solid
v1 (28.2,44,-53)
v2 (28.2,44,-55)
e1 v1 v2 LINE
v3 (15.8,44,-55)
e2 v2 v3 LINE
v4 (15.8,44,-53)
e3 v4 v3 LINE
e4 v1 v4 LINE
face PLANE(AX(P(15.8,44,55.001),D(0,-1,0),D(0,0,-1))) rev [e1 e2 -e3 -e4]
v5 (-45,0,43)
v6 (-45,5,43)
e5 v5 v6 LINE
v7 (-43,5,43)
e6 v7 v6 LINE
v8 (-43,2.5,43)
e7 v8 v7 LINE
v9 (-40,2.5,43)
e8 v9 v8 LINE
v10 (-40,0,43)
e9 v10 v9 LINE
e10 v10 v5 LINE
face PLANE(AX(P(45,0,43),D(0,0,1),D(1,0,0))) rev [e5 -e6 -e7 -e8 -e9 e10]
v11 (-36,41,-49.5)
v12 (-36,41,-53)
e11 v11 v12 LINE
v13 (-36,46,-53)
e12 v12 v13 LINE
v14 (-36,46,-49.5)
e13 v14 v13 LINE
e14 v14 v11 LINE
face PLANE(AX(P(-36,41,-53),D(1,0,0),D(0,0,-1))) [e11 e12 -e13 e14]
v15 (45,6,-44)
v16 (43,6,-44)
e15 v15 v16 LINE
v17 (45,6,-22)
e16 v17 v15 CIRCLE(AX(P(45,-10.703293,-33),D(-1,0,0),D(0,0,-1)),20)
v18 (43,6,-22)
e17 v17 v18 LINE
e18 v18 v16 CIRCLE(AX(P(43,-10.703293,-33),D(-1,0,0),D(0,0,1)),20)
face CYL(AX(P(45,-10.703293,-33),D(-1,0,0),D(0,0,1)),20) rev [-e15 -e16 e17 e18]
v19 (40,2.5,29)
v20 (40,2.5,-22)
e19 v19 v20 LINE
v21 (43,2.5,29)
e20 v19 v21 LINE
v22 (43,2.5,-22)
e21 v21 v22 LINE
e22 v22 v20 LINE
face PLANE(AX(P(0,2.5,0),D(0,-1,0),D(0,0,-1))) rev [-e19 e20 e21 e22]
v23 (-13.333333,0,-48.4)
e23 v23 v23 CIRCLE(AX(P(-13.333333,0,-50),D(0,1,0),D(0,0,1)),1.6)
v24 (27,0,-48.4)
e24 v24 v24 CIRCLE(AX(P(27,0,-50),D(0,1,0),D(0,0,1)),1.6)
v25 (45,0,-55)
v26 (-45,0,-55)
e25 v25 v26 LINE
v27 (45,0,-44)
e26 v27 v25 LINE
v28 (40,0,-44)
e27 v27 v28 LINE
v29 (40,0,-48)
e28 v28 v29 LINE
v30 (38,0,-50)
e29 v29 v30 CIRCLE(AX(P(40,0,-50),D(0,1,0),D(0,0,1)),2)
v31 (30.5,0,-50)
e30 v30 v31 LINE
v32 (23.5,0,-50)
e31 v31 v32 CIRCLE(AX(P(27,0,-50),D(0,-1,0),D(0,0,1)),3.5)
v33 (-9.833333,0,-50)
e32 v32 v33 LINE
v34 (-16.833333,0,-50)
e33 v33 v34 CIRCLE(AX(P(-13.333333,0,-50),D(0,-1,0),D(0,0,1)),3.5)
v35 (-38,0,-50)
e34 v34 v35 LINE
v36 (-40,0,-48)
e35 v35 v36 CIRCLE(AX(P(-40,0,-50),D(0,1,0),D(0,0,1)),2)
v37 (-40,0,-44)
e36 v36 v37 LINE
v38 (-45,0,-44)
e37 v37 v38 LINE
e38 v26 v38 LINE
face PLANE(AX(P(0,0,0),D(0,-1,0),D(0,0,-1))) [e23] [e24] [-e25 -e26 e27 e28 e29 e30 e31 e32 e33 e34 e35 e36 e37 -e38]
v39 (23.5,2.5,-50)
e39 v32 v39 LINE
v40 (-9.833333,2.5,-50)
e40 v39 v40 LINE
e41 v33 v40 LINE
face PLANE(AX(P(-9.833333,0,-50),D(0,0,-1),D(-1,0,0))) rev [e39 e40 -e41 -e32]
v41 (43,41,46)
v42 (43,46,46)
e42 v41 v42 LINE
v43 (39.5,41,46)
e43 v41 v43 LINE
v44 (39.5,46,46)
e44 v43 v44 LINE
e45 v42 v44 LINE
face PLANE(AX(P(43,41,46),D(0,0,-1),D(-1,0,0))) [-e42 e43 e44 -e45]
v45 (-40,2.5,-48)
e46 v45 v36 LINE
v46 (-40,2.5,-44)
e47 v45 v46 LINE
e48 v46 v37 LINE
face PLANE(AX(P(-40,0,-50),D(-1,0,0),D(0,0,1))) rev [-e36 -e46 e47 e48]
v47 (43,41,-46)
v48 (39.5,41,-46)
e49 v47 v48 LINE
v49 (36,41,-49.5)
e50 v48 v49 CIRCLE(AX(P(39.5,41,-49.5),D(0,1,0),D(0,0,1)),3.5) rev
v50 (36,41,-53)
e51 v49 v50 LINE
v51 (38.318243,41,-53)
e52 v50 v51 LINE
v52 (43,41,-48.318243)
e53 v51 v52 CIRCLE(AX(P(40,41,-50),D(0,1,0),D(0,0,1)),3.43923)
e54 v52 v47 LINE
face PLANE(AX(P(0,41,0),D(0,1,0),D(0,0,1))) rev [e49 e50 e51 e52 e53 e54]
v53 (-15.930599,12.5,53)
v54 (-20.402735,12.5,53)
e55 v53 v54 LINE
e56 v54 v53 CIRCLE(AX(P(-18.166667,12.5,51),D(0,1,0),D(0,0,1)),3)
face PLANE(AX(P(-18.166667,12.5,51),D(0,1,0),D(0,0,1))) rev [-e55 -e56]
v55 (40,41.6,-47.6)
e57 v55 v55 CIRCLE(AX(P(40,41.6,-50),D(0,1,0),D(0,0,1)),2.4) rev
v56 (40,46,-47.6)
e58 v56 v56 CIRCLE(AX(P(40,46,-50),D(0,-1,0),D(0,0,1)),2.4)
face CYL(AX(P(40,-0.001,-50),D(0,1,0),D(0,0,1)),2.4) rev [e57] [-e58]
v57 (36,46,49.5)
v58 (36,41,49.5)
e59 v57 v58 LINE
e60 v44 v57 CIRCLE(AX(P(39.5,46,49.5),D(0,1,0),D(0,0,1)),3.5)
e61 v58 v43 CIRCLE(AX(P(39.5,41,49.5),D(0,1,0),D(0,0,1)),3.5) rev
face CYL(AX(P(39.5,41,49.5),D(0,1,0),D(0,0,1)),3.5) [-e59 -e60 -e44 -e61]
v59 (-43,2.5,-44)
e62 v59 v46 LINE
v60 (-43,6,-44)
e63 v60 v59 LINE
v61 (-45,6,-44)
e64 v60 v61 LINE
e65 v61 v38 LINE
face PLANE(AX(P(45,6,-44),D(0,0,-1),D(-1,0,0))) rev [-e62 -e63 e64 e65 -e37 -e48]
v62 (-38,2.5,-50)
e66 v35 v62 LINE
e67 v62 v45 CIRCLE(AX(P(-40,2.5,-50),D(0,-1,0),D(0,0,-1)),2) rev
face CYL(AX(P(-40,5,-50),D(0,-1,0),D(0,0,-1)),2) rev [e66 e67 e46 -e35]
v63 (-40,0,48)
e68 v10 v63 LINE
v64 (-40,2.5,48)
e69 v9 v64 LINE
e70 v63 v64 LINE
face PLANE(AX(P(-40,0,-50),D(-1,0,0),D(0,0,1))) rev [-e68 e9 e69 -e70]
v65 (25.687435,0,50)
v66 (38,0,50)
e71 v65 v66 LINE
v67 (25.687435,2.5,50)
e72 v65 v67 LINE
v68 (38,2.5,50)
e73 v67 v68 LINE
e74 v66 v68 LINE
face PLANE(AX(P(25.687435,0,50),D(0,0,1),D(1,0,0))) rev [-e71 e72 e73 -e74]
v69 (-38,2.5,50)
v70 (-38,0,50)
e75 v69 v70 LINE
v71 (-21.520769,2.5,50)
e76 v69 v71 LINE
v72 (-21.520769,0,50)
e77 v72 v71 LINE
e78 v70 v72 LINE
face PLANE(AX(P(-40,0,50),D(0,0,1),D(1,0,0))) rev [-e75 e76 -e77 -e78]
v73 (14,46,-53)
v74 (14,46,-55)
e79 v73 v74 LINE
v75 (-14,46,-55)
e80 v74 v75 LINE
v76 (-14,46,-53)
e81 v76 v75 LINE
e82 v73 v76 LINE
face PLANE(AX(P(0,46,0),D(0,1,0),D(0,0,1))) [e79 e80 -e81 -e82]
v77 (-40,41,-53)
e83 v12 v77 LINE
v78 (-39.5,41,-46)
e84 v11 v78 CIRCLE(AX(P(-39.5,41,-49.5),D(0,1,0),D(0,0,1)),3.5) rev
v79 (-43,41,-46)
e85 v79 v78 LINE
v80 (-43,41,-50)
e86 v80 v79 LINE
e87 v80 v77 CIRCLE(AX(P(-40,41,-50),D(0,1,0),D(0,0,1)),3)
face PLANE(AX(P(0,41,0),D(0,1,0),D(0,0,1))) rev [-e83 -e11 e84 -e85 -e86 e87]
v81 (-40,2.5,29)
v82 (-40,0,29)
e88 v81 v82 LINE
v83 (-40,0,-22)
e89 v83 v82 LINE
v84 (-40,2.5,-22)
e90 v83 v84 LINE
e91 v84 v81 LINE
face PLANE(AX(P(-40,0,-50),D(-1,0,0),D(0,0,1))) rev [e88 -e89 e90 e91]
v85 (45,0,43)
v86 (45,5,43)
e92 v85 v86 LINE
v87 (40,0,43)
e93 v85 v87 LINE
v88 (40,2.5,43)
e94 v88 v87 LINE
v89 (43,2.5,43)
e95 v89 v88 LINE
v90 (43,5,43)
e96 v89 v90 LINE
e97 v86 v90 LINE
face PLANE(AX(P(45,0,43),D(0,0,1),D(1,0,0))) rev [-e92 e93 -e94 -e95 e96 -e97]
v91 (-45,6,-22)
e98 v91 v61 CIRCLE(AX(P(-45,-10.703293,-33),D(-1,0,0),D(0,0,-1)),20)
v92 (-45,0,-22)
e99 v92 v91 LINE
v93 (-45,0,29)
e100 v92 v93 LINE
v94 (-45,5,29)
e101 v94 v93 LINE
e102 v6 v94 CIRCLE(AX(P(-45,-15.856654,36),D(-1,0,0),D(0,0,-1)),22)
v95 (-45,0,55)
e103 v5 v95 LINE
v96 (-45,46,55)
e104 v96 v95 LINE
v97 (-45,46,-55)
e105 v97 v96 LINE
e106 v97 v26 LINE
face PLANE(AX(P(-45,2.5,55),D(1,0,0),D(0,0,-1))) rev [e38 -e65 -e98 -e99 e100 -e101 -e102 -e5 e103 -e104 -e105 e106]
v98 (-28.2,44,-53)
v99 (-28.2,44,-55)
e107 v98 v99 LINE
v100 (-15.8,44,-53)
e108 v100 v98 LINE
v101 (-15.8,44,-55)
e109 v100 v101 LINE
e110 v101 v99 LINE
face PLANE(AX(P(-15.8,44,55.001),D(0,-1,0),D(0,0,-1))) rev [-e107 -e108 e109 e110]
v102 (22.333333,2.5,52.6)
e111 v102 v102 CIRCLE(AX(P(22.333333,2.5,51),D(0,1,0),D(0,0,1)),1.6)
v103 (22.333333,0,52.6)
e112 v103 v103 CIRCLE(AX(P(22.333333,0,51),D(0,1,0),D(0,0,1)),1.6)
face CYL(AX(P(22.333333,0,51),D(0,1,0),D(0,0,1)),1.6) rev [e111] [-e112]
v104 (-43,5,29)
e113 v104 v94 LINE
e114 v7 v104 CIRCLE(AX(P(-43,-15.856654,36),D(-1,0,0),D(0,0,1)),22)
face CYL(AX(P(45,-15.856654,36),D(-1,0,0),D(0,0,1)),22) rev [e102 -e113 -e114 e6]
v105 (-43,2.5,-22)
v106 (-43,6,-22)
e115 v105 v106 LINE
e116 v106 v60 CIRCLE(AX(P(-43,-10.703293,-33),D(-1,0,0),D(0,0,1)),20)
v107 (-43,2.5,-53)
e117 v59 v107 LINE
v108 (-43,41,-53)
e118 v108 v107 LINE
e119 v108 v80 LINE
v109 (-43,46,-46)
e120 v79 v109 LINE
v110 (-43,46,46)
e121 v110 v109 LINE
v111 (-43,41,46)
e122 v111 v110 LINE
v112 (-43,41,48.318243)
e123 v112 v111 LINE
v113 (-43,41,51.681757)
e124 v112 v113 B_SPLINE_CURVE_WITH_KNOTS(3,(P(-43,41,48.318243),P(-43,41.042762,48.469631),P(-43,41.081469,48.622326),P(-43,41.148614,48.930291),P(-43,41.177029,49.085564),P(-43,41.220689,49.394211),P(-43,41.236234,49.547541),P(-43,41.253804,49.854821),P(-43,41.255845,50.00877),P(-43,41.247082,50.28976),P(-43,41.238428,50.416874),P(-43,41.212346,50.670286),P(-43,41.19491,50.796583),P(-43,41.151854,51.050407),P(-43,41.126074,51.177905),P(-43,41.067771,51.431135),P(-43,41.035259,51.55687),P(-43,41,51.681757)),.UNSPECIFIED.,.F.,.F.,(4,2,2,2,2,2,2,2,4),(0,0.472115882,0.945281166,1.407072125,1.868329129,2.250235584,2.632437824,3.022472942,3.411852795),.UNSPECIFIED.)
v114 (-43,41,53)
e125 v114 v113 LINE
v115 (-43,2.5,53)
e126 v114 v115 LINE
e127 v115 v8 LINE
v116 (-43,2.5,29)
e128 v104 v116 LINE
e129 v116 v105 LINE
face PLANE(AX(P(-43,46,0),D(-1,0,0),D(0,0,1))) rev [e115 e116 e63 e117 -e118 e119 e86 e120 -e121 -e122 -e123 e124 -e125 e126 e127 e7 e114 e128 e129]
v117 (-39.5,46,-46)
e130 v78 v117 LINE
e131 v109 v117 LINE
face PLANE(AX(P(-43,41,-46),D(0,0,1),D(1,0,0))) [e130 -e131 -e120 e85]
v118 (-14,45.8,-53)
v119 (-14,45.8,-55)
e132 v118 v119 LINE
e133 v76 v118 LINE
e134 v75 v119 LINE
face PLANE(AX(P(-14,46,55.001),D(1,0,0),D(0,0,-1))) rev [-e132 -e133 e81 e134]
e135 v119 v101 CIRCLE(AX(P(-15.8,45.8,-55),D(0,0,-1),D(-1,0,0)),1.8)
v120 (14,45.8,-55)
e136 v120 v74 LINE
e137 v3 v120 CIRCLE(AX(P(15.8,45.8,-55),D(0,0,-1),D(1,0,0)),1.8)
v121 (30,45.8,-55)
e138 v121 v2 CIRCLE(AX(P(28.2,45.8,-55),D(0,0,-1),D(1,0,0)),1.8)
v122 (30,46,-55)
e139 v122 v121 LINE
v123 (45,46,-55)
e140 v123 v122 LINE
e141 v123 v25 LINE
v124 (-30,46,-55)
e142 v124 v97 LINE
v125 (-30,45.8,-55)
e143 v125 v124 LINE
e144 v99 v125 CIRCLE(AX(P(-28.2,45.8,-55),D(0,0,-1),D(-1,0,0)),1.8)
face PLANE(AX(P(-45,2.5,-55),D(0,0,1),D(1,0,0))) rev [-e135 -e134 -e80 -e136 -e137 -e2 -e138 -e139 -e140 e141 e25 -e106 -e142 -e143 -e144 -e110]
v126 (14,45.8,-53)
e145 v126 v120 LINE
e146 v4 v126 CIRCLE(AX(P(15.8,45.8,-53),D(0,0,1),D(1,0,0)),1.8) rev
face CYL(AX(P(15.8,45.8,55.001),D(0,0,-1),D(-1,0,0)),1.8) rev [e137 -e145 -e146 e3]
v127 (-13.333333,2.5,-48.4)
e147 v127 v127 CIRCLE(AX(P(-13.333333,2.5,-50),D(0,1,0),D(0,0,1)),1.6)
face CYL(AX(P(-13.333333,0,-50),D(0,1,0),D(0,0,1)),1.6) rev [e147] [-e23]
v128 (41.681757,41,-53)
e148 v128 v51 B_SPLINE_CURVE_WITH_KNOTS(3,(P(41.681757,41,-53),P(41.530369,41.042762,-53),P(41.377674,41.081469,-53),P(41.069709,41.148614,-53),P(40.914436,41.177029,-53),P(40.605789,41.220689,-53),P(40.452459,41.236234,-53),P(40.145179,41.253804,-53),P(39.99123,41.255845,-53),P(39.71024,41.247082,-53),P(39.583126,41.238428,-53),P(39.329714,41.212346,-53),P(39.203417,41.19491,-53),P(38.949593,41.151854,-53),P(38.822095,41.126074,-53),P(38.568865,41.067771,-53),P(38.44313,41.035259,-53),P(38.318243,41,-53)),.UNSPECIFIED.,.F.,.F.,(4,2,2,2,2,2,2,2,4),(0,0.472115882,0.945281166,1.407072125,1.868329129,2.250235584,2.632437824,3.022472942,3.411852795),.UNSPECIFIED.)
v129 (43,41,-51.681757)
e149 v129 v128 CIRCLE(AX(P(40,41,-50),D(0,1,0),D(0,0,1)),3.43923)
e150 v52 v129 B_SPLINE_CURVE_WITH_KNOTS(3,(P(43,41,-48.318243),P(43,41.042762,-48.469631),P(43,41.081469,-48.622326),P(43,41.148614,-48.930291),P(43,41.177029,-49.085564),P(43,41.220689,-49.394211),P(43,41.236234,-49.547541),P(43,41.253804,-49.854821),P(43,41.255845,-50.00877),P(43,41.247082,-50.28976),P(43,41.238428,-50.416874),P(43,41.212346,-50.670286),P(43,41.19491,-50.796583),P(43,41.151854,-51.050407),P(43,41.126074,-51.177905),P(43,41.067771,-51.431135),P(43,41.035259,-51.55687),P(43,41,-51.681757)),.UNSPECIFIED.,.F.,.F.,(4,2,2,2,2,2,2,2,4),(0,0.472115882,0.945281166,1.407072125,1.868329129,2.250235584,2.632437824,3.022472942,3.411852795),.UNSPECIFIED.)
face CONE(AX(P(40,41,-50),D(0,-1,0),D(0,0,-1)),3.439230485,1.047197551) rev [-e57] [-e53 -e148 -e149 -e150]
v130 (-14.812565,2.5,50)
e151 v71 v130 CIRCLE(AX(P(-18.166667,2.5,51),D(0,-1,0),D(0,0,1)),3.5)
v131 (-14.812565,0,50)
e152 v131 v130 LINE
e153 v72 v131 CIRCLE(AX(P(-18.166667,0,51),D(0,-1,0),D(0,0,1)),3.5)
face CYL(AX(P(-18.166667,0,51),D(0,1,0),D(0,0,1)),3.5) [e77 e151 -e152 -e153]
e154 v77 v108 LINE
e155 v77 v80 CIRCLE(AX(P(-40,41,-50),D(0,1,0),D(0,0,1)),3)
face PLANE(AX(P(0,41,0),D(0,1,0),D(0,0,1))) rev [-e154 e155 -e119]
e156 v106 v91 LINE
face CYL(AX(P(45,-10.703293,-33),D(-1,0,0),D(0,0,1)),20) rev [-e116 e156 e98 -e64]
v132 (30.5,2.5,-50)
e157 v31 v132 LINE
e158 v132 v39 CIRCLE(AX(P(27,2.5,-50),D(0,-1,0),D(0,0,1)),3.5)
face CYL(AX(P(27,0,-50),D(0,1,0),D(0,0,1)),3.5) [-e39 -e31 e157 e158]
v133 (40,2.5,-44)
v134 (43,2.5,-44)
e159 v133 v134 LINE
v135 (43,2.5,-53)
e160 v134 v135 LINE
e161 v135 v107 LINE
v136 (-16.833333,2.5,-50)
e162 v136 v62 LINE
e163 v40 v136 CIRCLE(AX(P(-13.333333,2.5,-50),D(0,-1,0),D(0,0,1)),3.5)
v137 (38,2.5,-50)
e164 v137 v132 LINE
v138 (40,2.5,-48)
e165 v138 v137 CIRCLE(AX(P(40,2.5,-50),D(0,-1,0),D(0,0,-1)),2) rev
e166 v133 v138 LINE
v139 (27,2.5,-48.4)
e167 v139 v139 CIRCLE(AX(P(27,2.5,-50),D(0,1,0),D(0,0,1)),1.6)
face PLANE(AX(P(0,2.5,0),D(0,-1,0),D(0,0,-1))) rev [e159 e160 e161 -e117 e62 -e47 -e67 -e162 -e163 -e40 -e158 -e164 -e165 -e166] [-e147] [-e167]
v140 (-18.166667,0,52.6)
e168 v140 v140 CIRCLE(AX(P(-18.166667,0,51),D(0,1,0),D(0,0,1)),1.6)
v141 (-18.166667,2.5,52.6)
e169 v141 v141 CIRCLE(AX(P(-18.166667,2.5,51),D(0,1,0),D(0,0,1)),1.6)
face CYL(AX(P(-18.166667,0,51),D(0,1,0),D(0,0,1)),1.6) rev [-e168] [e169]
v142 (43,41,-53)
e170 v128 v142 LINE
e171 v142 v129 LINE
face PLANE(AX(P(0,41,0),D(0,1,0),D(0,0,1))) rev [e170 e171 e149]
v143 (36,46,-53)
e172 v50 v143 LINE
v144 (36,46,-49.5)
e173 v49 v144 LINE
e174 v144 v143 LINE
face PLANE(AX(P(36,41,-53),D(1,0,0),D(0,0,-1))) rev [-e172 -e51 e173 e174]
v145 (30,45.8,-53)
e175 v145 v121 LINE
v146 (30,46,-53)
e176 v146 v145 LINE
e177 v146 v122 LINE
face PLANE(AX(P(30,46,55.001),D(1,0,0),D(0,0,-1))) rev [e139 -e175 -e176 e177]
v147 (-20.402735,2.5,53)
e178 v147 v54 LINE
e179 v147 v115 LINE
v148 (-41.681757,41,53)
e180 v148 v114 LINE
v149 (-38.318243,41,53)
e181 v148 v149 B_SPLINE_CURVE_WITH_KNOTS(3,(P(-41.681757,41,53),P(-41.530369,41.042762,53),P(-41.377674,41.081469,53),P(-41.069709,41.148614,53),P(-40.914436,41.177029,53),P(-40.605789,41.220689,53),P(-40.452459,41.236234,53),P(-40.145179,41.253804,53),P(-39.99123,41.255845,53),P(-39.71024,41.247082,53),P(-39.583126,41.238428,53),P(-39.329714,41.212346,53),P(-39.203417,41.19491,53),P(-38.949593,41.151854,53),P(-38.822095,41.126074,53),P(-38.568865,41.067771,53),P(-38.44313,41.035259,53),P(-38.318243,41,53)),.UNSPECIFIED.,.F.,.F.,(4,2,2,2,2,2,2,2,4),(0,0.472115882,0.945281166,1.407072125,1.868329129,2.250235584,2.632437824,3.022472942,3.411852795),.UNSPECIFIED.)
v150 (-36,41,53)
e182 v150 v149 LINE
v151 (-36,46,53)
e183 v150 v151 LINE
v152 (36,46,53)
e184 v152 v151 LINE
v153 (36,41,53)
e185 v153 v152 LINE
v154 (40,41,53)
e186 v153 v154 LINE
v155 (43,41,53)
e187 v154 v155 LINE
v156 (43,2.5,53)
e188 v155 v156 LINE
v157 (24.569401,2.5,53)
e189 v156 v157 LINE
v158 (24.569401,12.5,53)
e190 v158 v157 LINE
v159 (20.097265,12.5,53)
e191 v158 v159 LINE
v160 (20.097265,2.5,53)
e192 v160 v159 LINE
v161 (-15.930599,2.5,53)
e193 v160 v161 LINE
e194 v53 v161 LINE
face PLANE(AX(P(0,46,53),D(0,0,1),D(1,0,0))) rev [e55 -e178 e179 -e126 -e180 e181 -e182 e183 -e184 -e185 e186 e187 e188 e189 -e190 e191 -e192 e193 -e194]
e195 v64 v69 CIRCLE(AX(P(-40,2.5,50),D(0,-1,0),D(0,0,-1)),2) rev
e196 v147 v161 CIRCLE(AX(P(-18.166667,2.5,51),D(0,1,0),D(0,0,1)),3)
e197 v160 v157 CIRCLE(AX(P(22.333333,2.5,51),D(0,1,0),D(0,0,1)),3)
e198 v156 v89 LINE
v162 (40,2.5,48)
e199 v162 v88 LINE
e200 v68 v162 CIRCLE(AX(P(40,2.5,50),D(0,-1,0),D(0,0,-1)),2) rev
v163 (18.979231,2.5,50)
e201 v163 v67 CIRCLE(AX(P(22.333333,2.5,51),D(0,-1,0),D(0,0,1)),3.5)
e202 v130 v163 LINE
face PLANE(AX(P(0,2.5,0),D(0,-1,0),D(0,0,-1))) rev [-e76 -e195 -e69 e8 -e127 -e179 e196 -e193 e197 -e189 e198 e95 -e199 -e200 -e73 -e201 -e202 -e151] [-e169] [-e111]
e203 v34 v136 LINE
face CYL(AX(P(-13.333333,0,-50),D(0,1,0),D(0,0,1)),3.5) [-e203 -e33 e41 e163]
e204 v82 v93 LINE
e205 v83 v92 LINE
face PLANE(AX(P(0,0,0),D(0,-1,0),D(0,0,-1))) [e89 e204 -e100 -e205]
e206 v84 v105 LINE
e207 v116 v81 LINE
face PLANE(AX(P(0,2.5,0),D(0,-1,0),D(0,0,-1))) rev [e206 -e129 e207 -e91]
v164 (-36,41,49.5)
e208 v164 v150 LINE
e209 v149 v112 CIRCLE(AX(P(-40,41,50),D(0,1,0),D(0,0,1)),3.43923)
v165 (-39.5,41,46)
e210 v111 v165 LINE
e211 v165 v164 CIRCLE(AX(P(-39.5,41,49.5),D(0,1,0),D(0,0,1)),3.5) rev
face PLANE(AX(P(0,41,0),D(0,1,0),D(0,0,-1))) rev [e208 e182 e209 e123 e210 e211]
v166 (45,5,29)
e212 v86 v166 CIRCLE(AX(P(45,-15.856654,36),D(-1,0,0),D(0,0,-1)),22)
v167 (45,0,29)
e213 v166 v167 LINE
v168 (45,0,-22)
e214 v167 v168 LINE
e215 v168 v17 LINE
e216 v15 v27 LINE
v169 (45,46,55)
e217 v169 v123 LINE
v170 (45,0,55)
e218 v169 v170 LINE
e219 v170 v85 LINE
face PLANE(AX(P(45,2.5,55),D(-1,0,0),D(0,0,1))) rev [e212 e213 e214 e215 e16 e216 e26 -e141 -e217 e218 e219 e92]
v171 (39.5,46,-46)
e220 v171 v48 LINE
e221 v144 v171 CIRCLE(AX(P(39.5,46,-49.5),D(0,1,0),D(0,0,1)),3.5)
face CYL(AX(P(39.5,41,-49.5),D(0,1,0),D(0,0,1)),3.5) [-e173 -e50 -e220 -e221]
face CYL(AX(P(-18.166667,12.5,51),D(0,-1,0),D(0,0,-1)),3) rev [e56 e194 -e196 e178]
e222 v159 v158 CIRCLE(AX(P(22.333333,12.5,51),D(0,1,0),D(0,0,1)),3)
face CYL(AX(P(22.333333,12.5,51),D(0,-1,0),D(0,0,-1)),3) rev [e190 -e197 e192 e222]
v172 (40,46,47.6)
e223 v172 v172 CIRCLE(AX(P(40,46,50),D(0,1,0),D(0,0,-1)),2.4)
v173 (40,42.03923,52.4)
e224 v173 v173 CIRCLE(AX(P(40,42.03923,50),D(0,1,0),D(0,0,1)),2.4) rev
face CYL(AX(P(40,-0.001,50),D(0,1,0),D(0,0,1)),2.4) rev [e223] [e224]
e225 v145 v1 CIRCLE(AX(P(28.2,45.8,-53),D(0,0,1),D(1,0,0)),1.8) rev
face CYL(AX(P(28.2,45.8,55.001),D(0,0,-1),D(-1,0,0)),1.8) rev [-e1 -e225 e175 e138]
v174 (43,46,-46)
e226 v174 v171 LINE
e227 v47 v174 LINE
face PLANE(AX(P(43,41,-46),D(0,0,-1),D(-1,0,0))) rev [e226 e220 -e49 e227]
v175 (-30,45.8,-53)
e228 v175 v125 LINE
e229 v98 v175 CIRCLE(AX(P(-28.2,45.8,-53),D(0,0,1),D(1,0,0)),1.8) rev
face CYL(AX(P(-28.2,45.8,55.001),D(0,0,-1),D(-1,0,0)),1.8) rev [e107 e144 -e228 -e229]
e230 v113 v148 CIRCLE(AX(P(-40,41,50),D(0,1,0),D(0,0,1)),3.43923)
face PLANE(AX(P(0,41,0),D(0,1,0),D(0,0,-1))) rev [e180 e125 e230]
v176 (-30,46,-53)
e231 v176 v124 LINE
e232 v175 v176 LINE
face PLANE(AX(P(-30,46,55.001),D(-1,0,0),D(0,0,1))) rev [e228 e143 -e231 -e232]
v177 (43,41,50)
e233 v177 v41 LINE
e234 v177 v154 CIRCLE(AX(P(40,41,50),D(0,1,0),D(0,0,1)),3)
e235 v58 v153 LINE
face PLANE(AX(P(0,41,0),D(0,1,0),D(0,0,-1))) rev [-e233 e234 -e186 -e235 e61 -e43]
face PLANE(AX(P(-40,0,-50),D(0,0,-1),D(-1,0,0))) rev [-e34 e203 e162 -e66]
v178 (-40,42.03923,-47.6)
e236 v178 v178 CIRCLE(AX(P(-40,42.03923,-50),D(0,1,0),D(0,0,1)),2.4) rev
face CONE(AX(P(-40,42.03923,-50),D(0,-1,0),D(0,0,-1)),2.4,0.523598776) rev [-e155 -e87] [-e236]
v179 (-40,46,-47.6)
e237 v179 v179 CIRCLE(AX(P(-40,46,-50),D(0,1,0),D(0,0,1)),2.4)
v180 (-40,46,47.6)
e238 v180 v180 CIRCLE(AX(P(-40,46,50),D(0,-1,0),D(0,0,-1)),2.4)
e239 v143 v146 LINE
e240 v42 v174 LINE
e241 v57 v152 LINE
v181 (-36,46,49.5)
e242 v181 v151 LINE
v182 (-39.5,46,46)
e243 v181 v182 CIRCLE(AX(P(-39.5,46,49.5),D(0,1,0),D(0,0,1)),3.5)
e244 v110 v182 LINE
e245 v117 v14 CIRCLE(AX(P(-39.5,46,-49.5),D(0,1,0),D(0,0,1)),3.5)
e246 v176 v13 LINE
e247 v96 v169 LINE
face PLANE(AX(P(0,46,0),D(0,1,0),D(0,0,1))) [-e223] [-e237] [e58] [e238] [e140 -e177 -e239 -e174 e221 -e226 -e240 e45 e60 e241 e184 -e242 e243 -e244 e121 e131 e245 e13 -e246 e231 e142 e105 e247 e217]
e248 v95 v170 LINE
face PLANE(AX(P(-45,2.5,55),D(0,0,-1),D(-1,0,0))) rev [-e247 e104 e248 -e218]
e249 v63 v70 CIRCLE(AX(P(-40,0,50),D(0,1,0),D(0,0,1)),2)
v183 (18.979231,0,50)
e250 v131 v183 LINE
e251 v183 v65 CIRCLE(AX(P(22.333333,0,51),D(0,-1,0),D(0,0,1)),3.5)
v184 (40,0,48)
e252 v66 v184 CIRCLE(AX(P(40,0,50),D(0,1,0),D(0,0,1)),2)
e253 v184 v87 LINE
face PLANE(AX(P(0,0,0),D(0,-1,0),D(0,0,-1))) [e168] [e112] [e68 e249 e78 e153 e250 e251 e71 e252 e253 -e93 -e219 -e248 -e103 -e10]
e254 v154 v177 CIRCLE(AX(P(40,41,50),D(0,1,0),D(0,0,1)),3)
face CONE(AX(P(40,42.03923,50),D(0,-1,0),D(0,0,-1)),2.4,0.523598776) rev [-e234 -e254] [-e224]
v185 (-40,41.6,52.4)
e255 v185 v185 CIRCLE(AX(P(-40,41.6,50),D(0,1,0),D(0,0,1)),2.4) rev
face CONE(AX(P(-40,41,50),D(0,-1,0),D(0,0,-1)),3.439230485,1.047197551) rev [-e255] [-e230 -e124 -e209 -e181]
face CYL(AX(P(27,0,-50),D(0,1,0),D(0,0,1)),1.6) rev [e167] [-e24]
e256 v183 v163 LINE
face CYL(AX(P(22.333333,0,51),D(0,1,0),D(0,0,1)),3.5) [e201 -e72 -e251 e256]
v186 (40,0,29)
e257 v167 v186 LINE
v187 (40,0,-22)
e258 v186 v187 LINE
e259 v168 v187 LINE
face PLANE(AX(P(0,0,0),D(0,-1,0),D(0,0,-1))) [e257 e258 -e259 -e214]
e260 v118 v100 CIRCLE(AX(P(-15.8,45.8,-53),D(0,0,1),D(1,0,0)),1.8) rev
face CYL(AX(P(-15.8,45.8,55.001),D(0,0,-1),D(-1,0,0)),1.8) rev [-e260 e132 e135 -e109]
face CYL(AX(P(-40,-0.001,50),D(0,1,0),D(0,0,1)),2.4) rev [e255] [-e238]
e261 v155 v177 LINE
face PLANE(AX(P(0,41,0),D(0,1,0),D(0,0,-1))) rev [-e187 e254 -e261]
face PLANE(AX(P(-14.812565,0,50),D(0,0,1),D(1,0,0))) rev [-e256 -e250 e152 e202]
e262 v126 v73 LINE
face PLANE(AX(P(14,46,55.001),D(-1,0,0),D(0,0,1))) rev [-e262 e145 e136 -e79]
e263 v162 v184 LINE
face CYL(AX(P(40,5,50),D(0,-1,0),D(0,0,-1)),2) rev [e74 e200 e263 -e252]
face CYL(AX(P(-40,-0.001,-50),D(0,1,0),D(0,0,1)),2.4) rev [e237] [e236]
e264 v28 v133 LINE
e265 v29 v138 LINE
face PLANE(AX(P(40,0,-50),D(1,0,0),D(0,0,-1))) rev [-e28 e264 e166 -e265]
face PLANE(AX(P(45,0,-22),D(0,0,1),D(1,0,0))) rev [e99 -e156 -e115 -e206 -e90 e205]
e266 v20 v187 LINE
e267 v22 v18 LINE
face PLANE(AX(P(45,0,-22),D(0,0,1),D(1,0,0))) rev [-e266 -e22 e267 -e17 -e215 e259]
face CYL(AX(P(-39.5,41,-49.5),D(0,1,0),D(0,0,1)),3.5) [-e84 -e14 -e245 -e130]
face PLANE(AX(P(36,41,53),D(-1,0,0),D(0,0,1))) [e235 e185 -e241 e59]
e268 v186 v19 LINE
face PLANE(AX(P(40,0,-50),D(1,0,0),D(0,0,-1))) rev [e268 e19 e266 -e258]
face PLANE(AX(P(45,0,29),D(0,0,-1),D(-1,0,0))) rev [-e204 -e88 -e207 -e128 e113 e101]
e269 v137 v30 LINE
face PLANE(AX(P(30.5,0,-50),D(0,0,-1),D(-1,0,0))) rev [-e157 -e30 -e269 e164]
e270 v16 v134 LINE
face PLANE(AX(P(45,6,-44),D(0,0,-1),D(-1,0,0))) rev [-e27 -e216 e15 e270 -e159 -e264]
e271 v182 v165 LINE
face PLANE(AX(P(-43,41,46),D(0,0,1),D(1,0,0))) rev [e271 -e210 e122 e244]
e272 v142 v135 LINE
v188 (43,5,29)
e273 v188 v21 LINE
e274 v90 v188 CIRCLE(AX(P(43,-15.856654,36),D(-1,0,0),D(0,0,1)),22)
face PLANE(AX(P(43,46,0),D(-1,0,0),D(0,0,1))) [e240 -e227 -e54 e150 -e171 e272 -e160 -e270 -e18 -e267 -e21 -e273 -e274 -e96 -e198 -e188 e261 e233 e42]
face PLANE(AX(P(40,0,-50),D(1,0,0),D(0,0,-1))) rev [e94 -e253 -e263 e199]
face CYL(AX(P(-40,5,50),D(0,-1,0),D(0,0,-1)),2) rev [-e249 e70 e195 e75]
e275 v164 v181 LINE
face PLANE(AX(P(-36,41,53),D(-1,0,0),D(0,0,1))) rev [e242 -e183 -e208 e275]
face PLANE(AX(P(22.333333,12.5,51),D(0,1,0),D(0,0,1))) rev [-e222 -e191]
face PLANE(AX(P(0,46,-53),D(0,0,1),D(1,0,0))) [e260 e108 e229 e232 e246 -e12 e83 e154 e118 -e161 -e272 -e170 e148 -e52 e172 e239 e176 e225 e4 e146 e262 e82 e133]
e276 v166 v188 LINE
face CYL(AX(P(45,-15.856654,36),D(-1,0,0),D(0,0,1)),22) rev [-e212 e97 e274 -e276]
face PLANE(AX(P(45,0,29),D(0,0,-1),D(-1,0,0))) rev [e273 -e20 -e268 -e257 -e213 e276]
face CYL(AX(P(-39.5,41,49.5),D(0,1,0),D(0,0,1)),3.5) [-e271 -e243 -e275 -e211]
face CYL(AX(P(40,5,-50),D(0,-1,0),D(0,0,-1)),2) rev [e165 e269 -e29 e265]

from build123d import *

# Parameters (mm, degrees)
SKETCH1_W               = 90
SKETCH1_H               = 110
BOSS_EXTRUDE1_DEPTH     = 2.5
CUT_EXTRUDE1_DEPTH      = 72.107313267
SKETCH6_R               = 1.6
CUT_EXTRUDE4_DEPTH      = 72.107313267
SKETCH3_W               = 90
SKETCH3_H               = 110
SKETCH3_W_2             = 86
SKETCH3_H_2             = 106
BOSS_EXTRUDE2_DEPTH     = 43.5
SKETCH4_W               = 7
SKETCH4_H               = 7
BOSS_EXTRUDE3_DEPTH     = 5
CUT_EXTRUDE3_REACH      = 86.652
SKETCH5_R               = 2.4
MIRROR2_COPY_1_SKETCH_W = 7
MIRROR2_COPY_1_SKETCH_H = 7
MIRROR2_COPY_1_DEPTH    = 5
MIRROR2_COPY_2_REACH    = 86.652
MIRROR2_COPY_2_SKETCH_R = 2.4
SKETCH8_R               = 3
CUT_EXTRUDE5_DEPTH      = 10
CUT_EXTRUDE6_DEPTH      = 116.06954419
CUT_EXTRUDE7_REACH      = 129.44
SKETCH12_R              = 2
CUT_EXTRUDE8_DEPTH      = 5
CHAMFER1_SIZE           = 0.6
CHAMFER1_SIZE_2         = 1.039230485
FILLET1_R               = 3.5


with BuildPart() as part:
    # Sketch1 → Boss-Extrude1 (new body)
    with BuildSketch(Plane(origin=(0, 0, 0), x_dir=(1, 0, 0), z_dir=(0, 1, 0))):
        Rectangle(SKETCH1_W, SKETCH1_H)
    extrude(amount=BOSS_EXTRUDE1_DEPTH)

    # Sketch2 → Cut-Extrude1 (cut, through all)
    with BuildSketch(Plane(origin=(0, 2.5, 0), x_dir=(1, 0, 0), z_dir=(0, 1, 0))):
        with BuildLine():
            Line((-40, 50), (-16.83333333, 50))
            ThreePointArc((-16.83333333, 50), (-13.33333333, 46.5), (-9.83333333, 50))
            Line((-9.83333333, 50), (23.5, 50))
            ThreePointArc((23.5, 50), (27, 46.5), (30.5, 50))
            Line((30.5, 50), (40, 50))
            Line((40, 50), (40, -50))
            Line((40, -50), (25.6874353, -50))
            ThreePointArc((25.6874353, -50), (22.333333333, -47.5), (18.979231367, -50))
            Line((18.979231367, -50), (-14.8125647, -50))
            ThreePointArc((-14.8125647, -50), (-18.166666667, -47.5), (-21.520768633, -50))
            Line((-21.520768633, -50), (-40, -50))
            Line((-40, -50), (-40, 50))
        make_face()
    extrude(amount=-CUT_EXTRUDE1_DEPTH, mode=Mode.SUBTRACT)

    # Sketch6 → Cut-Extrude4 (cut, through all)
    with BuildSketch(Plane(origin=(0, 2.5, 0), x_dir=(1, 0, 0), z_dir=(0, 1, 0))):
        with Locations(Location((-13.33333333, 50, 0), (0, 0, 270))):
            Circle(SKETCH6_R)
        with Locations(Location((27, 50, 0), (0, 0, 270))):
            Circle(SKETCH6_R)
        with Locations(Location((22.333333333, -51, 0), (0, 0, 270))):
            Circle(SKETCH6_R)
        with Locations(Location((-18.166666667, -51, 0), (0, 0, 270))):
            Circle(SKETCH6_R)
    extrude(amount=-CUT_EXTRUDE4_DEPTH, mode=Mode.SUBTRACT)

    # Sketch3 → Boss-Extrude2 (add)
    with BuildSketch(Plane(origin=(0, 2.5, 0), x_dir=(1, 0, 0), z_dir=(0, 1, 0))):
        Rectangle(SKETCH3_W, SKETCH3_H)
        Rectangle(SKETCH3_W_2, SKETCH3_H_2, mode=Mode.SUBTRACT)
    extrude(amount=BOSS_EXTRUDE2_DEPTH)

    # Sketch4 → Boss-Extrude3 (add)
    with BuildSketch(Plane(origin=(0, 46, 0), x_dir=(1, 0, 0), z_dir=(0, 1, 0))):
        with Locations((-39.5, 49.5)):
            Rectangle(SKETCH4_W, SKETCH4_H)
    boss_extrude3 = extrude(amount=-BOSS_EXTRUDE3_DEPTH)

    # Sketch5 → Cut-Extrude3 (cut, up to next)
    with BuildSketch(Plane(origin=(0, 46, 0), x_dir=(1, 0, 0), z_dir=(0, 1, 0)), mode=Mode.PRIVATE) as cut_extrude3_sk1:
        with Locations(Location((-40, 50, 0), (0, 0, 270))):
            Circle(SKETCH5_R)
    cut_extrude3_tool1 = extrude(cut_extrude3_sk1.sketch, amount=-CUT_EXTRUDE3_REACH, mode=Mode.PRIVATE) & part.part
    cut_extrude3 = cut_extrude3_tool1.solids().sort_by_distance((-40, 46, -50))[0]
    add(cut_extrude3, mode=Mode.SUBTRACT)

    # Mirror1: Boss-Extrude3, Cut-Extrude3 across plane
    add(boss_extrude3.mirror(Plane(origin=(0, 0, 0), x_dir=(0, 0, 1), z_dir=(1, 0, 0))))
    add(cut_extrude3.mirror(Plane(origin=(0, 0, 0), x_dir=(0, 0, 1), z_dir=(1, 0, 0))), mode=Mode.SUBTRACT)

    # Mirror2: Boss-Extrude3, Cut-Extrude3 across plane
    add(boss_extrude3.mirror(Plane.XY))
    add(cut_extrude3.mirror(Plane.XY), mode=Mode.SUBTRACT)

    # Mirror2 copy 1 sketch → Mirror2 copy 1 (add)
    with BuildSketch(Plane(origin=(0, 46, 0), x_dir=(-1, 0, 0), z_dir=(0, 1, 0))):
        with Locations((-39.5, 49.5)):
            Rectangle(MIRROR2_COPY_1_SKETCH_W, MIRROR2_COPY_1_SKETCH_H)
    extrude(amount=-MIRROR2_COPY_1_DEPTH)

    # Mirror2 copy 2 sketch → Mirror2 copy 2 (cut, up to next)
    with BuildSketch(Plane(origin=(0, 46, 0), x_dir=(-1, 0, 0), z_dir=(0, 1, 0)), mode=Mode.PRIVATE) as mirror2_copy_2_sk1:
        with Locations(Location((-40, 50, 0), (0, 0, 270))):
            Circle(MIRROR2_COPY_2_SKETCH_R)
    mirror2_copy_2_tool1 = extrude(mirror2_copy_2_sk1.sketch, amount=-MIRROR2_COPY_2_REACH, mode=Mode.PRIVATE) & part.part
    add(mirror2_copy_2_tool1.solids().sort_by_distance((40, 46, 50))[0], mode=Mode.SUBTRACT)

    # Sketch8 → Cut-Extrude5 (cut)
    with BuildSketch(Plane(origin=(0, 2.5, 0), x_dir=(1, 0, 0), z_dir=(0, 1, 0))):
        with Locations((-18.166666667, -51)):
            Circle(SKETCH8_R)
        with Locations((22.333333333, -51)):
            Circle(SKETCH8_R)
    extrude(amount=CUT_EXTRUDE5_DEPTH, mode=Mode.SUBTRACT)

    # Sketch9 → Cut-Extrude6 (cut, through all)
    with BuildSketch(Plane.ZY.offset(45)):
        with BuildLine():
            Line((-44, 6), (-44, 0))
            Line((-44, 0), (-22, 0))
            Line((-22, 0), (-22, 6))
            ThreePointArc((-22, 6), (-33, 9.296706912), (-44, 6))
        make_face()
        with BuildLine():
            Line((29, 0), (43, 0))
            Line((43, 0), (43, 5))
            ThreePointArc((43, 5), (36, 6.143346385), (29, 5))
            Line((29, 5), (29, 0))
        make_face()
    extrude(amount=-CUT_EXTRUDE6_DEPTH, mode=Mode.SUBTRACT)

    # Sketch10 → Cut-Extrude7 (cut, up to next)
    with BuildSketch(Plane(origin=(0, 0, -55), x_dir=(-1, 0, 0), z_dir=(0, 0, -1)), mode=Mode.PRIVATE) as cut_extrude7_sk1:
        with BuildLine():
            Line((14, 46), (30, 46))
            Line((30, 46), (30, 45.8))
            ThreePointArc((30, 45.8), (29.472792206, 44.527207794), (28.2, 44))
            Line((28.2, 44), (15.8, 44))
            ThreePointArc((15.8, 44), (14.527207794, 44.527207794), (14, 45.8))
            Line((14, 45.8), (14, 46))
        make_face()
    cut_extrude7_tool1 = extrude(cut_extrude7_sk1.sketch, amount=-CUT_EXTRUDE7_REACH, mode=Mode.PRIVATE) & part.part
    # Sketch10 → Cut-Extrude7 (cut, up to next)
    with BuildSketch(Plane(origin=(0, 0, -55), x_dir=(-1, 0, 0), z_dir=(0, 0, -1)), mode=Mode.PRIVATE) as cut_extrude7_sk2:
        with BuildLine():
            Line((-30, 46), (-30, 45.8))
            ThreePointArc((-30, 45.8), (-29.472792206, 44.527207794), (-28.2, 44))
            Line((-28.2, 44), (-15.8, 44))
            ThreePointArc((-15.8, 44), (-14.527207794, 44.527207794), (-14, 45.8))
            Line((-14, 45.8), (-14, 46))
            Line((-14, 46), (-30, 46))
        make_face()
    cut_extrude7_tool2 = extrude(cut_extrude7_sk2.sketch, amount=-CUT_EXTRUDE7_REACH, mode=Mode.PRIVATE) & part.part
    add(cut_extrude7_tool1.solids().sort_by_distance((-22, 45.027165, -55))[0], mode=Mode.SUBTRACT)
    add(cut_extrude7_tool2.solids().sort_by_distance((22, 45.027165, -55))[0], mode=Mode.SUBTRACT)

    # Sketch12 → Cut-Extrude8 (cut)
    with BuildSketch(Plane(origin=(0, 0, 0), x_dir=(1, 0, 0), z_dir=(0, 1, 0))):
        with Locations((-40, -50)):
            Circle(SKETCH12_R)
        with Locations((40, -50)):
            Circle(SKETCH12_R)
        with Locations((-40, 50)):
            Circle(SKETCH12_R)
        with Locations((40, 50)):
            Circle(SKETCH12_R)
    extrude(amount=CUT_EXTRUDE8_DEPTH, mode=Mode.SUBTRACT)

    # Chamfer1
    # the kernel refuses this chamfer: 1.039230485, 0.6 mm, written as the material it takes off along each edge
    with BuildSketch(Plane(origin=(-40, 41, -50), x_dir=(0, 0, 1), z_dir=(-1, 0, 0))) as chamfer1_piece_1_section:
        Polygon((2.4 + CHAMFER1_SIZE, 0), (2.4, CHAMFER1_SIZE_2), (2.4, 0), align=None)
    chamfer1_piece_1 = revolve(axis=Axis((-40, 41, -50), (0, 1, 0)), mode=Mode.PRIVATE)
    chamfer1_piece_1 = split(chamfer1_piece_1, bisect_by=Plane(origin=(-43, 41.510650162, -52.684472026), z_dir=(1, 0, 0)), keep=Keep.TOP, mode=Mode.PRIVATE)
    chamfer1_piece_1 = split(chamfer1_piece_1, bisect_by=Plane(origin=(-40, 41.510650162, -53), z_dir=(0, 0, 1)), keep=Keep.TOP, mode=Mode.PRIVATE)
    add(chamfer1_piece_1, mode=Mode.SUBTRACT)
    with BuildSketch(Plane(origin=(40, 41, -50), x_dir=(0, 0, 1), z_dir=(1, 0, 0))) as chamfer1_piece_2_section:
        Polygon((2.4 + CHAMFER1_SIZE_2, 0), (2.4, -CHAMFER1_SIZE), (2.4, 0), align=None)
    chamfer1_piece_2 = revolve(axis=Axis((40, 41, -50), (0, -1, 0)), mode=Mode.PRIVATE)
    chamfer1_piece_2 = split(chamfer1_piece_2, bisect_by=Plane(origin=(40, 41.284402775, -53), z_dir=(0, 0, 1)), keep=Keep.TOP, mode=Mode.PRIVATE)
    chamfer1_piece_2 = split(chamfer1_piece_2, bisect_by=Plane(origin=(43, 41.284402775, -52.91061018), z_dir=(-1, 0, 0)), keep=Keep.TOP, mode=Mode.PRIVATE)
    add(chamfer1_piece_2, mode=Mode.SUBTRACT)
    with BuildSketch(Plane(origin=(40, 41, 50), x_dir=(0, 0, -1), z_dir=(1, 0, 0))) as chamfer1_piece_3_section:
        Polygon((2.4 + CHAMFER1_SIZE, 0), (2.4, CHAMFER1_SIZE_2), (2.4, 0), align=None)
    chamfer1_piece_3 = revolve(axis=Axis((40, 41, 50), (0, 1, 0)), mode=Mode.PRIVATE)
    chamfer1_piece_3 = split(chamfer1_piece_3, bisect_by=Plane(origin=(43, 41.510650162, 52.684472026), z_dir=(-1, 0, 0)), keep=Keep.TOP, mode=Mode.PRIVATE)
    chamfer1_piece_3 = split(chamfer1_piece_3, bisect_by=Plane(origin=(40, 41.510650162, 53), z_dir=(0, 0, -1)), keep=Keep.TOP, mode=Mode.PRIVATE)
    add(chamfer1_piece_3, mode=Mode.SUBTRACT)
    with BuildSketch(Plane(origin=(-40, 41, 50), x_dir=(0, 0, -1), z_dir=(-1, 0, 0))) as chamfer1_piece_4_section:
        Polygon((2.4 + CHAMFER1_SIZE_2, 0), (2.4, -CHAMFER1_SIZE), (2.4, 0), align=None)
    chamfer1_piece_4 = revolve(axis=Axis((-40, 41, 50), (0, -1, 0)), mode=Mode.PRIVATE)
    chamfer1_piece_4 = split(chamfer1_piece_4, bisect_by=Plane(origin=(-43, 41.284402775, 52.91061018), z_dir=(1, 0, 0)), keep=Keep.TOP, mode=Mode.PRIVATE)
    chamfer1_piece_4 = split(chamfer1_piece_4, bisect_by=Plane(origin=(-40, 41.284402775, 53), z_dir=(0, 0, -1)), keep=Keep.TOP, mode=Mode.PRIVATE)
    add(chamfer1_piece_4, mode=Mode.SUBTRACT)

    # Fillet1
    fillet1_edges = [part.edges().sort_by_distance(p)[0] for p in [
        (36, 43.5, -46),
        (36, 43.5, 46),
        (-36, 43.5, 46),
        (-36, 43.5, -46),
    ]]
    fillet(fillet1_edges, radius=FILLET1_R)


solid = part.part
